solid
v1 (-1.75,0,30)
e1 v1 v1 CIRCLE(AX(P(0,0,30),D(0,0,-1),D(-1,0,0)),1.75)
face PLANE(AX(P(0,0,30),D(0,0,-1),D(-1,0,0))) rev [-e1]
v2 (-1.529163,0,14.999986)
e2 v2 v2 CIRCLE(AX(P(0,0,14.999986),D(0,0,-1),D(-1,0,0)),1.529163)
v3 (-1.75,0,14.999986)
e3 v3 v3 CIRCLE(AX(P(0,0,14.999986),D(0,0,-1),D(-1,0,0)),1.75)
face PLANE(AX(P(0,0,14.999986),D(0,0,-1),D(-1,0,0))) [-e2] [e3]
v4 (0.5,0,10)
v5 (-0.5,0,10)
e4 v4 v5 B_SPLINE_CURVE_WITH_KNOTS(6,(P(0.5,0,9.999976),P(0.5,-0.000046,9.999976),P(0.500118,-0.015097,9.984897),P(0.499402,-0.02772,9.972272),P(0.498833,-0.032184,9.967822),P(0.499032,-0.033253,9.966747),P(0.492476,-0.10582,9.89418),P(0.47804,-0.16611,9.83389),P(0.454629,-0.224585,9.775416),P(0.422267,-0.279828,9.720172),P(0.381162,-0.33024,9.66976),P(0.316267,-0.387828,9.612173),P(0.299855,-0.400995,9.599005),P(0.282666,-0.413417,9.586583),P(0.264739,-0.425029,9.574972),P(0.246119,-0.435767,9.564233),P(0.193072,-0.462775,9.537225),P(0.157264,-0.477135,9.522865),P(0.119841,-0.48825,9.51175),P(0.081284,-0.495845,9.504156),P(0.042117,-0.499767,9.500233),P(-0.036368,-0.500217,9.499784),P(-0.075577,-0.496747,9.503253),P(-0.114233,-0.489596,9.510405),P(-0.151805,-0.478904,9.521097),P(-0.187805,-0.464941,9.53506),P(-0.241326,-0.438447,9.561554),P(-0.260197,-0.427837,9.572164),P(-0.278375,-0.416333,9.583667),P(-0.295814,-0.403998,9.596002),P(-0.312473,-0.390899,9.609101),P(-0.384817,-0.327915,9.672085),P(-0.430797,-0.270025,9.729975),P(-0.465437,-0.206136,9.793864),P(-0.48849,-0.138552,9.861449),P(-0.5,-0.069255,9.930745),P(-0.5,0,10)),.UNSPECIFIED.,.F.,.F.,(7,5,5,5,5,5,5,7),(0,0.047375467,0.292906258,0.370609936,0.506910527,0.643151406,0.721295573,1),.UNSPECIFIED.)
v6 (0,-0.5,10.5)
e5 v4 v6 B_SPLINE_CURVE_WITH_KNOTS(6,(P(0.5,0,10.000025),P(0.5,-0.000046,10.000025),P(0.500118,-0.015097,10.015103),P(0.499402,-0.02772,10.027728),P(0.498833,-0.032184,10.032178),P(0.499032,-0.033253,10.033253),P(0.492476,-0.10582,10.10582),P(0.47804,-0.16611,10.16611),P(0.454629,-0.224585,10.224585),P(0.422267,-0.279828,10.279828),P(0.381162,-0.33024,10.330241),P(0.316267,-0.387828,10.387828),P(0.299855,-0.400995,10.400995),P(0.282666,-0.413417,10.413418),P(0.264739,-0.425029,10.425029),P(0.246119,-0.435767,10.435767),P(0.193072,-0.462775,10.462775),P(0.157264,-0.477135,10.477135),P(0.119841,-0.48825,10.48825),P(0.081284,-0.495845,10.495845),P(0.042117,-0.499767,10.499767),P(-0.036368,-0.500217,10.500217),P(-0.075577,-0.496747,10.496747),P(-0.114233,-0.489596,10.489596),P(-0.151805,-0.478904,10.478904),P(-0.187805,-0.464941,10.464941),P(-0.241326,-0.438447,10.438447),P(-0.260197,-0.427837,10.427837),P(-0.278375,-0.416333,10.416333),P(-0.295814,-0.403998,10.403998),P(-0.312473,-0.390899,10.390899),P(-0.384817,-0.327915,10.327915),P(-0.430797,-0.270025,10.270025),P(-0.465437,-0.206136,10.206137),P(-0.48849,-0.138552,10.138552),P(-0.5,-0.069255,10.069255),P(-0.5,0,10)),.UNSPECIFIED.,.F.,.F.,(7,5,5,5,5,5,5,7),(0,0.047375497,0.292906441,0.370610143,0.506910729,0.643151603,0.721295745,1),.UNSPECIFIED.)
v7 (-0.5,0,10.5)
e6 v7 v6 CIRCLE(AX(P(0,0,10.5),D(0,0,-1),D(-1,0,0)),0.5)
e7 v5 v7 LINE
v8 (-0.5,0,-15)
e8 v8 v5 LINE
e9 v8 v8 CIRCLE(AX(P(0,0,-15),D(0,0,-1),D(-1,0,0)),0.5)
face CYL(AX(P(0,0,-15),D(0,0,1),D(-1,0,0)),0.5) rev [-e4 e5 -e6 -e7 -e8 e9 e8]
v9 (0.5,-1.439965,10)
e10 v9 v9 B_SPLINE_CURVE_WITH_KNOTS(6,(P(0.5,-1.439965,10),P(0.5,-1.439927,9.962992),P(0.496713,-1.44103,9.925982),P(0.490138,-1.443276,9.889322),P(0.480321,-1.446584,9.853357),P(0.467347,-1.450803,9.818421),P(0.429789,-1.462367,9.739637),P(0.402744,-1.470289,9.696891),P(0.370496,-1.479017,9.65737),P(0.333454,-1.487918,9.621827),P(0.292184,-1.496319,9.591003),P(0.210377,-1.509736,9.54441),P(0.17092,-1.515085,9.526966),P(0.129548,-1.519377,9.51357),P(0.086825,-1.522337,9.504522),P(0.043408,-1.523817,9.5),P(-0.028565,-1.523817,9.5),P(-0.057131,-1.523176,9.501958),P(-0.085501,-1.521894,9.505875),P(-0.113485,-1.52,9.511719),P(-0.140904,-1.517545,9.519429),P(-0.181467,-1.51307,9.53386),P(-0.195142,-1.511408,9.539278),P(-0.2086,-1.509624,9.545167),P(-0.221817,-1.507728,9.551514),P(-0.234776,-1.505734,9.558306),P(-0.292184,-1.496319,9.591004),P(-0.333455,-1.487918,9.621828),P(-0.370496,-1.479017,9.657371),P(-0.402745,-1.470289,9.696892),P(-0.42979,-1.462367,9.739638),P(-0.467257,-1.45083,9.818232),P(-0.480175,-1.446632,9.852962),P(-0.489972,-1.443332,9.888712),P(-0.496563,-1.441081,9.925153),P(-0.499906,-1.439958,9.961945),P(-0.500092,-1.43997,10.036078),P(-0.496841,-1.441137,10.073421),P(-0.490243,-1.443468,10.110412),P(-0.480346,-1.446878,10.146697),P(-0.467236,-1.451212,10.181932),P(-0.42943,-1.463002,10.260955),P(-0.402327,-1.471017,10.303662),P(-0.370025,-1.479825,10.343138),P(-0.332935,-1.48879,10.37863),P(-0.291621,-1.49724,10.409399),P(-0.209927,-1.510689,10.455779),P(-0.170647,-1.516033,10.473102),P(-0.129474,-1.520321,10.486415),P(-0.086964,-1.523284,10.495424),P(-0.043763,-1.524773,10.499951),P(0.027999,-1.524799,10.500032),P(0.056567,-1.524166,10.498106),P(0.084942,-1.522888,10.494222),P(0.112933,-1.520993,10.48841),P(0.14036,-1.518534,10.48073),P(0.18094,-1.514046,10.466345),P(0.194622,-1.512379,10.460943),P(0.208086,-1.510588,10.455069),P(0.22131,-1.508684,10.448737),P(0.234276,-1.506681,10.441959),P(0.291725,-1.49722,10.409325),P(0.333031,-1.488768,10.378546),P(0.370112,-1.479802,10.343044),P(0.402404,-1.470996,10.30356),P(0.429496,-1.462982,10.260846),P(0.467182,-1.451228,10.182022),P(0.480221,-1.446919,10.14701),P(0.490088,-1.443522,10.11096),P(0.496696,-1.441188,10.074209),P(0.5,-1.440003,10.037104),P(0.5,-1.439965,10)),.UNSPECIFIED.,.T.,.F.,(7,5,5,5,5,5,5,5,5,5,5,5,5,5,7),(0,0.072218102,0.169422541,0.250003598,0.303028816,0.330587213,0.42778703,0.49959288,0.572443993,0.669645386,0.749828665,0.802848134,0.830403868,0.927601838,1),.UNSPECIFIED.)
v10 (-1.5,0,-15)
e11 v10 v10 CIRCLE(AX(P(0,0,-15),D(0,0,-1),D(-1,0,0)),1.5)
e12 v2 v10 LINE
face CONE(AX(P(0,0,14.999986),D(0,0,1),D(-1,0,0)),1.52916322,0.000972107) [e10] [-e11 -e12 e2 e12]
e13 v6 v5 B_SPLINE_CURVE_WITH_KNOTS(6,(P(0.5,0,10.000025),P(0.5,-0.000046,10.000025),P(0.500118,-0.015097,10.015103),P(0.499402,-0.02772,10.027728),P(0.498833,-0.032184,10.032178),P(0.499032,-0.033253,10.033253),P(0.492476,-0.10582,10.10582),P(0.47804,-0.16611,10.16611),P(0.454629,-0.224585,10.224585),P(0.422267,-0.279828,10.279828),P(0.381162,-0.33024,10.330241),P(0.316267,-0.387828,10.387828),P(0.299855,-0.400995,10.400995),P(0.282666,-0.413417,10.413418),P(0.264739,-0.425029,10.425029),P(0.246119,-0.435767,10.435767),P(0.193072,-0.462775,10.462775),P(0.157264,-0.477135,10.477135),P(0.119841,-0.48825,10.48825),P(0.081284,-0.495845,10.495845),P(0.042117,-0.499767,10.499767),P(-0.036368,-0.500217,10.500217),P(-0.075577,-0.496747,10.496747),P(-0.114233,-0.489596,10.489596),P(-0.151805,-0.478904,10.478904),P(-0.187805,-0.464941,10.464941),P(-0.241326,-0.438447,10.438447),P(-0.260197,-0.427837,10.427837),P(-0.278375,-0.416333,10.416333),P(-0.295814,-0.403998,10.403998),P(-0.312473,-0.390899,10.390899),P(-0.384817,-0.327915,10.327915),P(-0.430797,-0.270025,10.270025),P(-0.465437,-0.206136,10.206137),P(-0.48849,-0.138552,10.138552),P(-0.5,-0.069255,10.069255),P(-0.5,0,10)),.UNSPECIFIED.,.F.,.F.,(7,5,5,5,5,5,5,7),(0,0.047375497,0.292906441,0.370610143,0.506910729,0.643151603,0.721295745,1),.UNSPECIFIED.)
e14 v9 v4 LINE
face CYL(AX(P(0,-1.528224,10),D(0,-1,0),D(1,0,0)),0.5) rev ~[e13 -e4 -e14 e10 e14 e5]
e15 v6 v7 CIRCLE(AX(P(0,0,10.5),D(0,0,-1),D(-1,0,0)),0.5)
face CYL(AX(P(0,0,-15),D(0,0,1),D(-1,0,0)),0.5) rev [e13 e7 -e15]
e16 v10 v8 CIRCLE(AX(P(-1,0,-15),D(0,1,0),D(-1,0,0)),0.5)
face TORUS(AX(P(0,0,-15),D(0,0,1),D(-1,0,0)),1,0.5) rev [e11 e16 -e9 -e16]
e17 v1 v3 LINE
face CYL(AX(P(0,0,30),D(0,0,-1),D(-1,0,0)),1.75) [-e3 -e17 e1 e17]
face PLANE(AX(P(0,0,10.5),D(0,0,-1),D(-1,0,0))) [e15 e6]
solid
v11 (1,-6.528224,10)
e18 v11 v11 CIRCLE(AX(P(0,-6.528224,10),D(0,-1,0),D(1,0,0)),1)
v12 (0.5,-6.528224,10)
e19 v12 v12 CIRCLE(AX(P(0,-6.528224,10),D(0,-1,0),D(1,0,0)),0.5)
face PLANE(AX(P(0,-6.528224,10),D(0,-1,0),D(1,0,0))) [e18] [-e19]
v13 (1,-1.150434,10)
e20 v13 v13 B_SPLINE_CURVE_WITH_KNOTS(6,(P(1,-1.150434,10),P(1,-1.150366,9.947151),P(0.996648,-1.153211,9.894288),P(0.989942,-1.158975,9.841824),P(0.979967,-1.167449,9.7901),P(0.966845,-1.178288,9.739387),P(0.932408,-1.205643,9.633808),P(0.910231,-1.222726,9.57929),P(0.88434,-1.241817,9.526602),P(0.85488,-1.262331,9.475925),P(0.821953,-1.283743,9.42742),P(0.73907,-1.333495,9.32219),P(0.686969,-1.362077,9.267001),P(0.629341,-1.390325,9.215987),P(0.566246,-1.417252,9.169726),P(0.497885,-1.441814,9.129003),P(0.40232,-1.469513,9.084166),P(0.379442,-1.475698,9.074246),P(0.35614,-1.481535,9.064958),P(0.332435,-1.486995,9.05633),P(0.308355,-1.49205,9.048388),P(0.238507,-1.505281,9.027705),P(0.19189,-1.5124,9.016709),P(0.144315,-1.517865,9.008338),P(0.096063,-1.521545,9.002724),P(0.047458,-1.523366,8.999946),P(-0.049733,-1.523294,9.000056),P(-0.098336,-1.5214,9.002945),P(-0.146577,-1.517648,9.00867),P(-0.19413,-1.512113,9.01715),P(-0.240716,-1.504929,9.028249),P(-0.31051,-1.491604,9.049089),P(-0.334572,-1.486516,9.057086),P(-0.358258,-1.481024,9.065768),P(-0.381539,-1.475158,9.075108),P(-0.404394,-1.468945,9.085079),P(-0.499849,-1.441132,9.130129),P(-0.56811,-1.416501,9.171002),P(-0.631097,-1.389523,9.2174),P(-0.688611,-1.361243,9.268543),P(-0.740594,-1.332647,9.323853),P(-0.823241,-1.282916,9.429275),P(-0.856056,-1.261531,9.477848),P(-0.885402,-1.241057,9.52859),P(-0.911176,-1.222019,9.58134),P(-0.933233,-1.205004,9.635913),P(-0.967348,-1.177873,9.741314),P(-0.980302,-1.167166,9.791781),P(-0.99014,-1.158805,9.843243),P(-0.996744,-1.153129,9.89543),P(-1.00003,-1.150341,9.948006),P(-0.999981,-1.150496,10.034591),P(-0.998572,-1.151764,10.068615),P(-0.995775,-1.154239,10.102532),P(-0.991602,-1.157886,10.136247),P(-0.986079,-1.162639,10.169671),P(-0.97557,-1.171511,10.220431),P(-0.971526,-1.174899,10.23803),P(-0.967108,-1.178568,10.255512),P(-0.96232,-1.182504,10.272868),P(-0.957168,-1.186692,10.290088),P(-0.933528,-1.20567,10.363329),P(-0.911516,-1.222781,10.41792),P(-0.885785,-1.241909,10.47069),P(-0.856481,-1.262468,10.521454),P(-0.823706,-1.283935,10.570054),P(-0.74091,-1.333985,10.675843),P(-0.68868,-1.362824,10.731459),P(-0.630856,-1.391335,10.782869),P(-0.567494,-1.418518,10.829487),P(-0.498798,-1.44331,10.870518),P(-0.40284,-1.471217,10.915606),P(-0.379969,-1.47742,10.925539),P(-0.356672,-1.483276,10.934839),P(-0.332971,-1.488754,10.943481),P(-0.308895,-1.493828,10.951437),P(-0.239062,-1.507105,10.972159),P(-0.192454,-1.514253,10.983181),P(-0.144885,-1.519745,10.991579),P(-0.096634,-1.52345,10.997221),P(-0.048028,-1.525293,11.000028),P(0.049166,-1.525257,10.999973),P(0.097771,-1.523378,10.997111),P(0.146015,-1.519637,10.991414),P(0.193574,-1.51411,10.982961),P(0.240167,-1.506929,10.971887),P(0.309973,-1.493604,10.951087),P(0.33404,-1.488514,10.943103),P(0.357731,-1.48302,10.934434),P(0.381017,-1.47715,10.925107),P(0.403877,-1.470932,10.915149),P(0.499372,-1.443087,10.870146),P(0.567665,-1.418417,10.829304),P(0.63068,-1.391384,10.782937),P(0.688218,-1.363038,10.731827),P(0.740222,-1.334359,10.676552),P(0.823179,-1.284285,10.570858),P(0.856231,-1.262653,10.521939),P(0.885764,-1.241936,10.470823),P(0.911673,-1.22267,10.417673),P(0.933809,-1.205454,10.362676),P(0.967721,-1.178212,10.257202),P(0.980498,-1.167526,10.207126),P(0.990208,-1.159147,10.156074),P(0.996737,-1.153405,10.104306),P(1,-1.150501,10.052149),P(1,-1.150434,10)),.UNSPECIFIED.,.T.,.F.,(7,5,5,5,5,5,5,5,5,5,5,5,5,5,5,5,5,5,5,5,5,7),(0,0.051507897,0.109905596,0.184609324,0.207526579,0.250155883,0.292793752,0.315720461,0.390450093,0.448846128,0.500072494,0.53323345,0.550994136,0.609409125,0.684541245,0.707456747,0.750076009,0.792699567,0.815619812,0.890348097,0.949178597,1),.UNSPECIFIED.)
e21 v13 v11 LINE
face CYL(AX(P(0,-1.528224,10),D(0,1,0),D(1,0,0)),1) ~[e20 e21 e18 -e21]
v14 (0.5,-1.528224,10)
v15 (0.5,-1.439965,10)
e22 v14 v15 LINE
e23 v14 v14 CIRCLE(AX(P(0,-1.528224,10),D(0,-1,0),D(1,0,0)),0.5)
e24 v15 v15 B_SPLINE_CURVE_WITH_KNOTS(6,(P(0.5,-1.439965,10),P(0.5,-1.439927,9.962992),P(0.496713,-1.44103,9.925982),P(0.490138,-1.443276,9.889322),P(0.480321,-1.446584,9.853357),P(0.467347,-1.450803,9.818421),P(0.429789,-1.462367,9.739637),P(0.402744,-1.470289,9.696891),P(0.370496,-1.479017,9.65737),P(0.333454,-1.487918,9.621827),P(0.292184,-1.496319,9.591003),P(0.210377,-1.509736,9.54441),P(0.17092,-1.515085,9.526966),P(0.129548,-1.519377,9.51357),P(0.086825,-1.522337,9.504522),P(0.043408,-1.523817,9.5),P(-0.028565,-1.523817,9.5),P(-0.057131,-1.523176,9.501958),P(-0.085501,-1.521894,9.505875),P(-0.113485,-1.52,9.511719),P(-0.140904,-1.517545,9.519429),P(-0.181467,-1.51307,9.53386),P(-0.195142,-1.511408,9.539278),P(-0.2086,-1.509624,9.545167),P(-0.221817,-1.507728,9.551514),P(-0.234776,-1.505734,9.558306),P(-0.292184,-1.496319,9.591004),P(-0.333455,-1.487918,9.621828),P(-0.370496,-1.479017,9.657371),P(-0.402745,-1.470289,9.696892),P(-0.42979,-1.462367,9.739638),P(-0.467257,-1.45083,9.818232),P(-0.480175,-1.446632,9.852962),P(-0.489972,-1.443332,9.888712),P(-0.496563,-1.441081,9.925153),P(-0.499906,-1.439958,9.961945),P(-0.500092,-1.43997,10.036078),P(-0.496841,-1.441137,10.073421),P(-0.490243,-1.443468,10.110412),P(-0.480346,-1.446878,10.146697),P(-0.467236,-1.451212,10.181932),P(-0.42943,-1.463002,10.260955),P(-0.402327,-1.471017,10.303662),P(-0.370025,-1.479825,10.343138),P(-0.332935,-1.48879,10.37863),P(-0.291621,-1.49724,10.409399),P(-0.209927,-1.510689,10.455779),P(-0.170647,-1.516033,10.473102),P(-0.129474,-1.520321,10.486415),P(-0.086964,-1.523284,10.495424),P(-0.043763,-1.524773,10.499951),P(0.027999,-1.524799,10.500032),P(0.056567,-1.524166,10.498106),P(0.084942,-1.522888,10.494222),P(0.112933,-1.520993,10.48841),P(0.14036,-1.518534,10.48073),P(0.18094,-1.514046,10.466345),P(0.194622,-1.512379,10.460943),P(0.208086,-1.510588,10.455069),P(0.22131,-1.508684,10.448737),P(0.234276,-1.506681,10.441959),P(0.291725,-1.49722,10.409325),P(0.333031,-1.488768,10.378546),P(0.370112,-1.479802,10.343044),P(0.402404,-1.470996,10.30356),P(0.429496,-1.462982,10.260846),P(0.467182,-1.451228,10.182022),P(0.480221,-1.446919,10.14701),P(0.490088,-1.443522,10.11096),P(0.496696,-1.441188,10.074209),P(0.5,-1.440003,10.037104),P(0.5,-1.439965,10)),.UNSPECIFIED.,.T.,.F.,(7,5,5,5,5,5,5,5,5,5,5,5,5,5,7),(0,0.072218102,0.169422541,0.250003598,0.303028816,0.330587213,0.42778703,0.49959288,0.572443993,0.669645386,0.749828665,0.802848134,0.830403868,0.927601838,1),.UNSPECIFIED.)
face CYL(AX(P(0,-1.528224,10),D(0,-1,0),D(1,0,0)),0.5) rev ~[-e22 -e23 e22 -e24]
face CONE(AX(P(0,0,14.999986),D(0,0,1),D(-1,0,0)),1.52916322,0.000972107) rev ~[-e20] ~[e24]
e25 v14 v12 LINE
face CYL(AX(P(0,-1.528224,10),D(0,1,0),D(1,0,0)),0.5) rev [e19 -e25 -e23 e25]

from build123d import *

# Parameters (mm, degrees)
F4_R     = 0.5
F5_REACH = 4.6934378881
F4_R_2   = 1
F7_DEPTH = 5


with BuildPart() as f1:
    # F0 (on Front) → F1 (revolve)
    with BuildSketch(Plane.XZ):
        with BuildLine():
            Line((-1.5291632199, 14.9999860381), (-1.5, -14.999999787))
            ThreePointArc((-1.5, -14.999999787), (-1, -14.499999787), (-0.5, -14.999999787))
            Line((-0.5, -14.999999787), (-0.5000000003, 10.500000213))
            Line((-0.5000000003, 10.500000213), (-3e-10, 10.500000213))
            Line((-3e-10, 10.500000213), (-3e-10, 30.000000213))
            Line((-3e-10, 30.000000213), (-1.7500000003, 30.000000213))
            Line((-1.7500000003, 30.000000213), (-1.7500000003, 14.9999860381))
            Line((-1.7500000003, 14.9999860381), (-1.5291632199, 14.9999860381))
        make_face()
    revolve(axis=Axis((-3e-10, 0, 7.500000213), (0, 0, -1)))

    f5_end = f1.faces().sort_by_distance((0.4999999994, 0, -2.249999787))[0]
    # F4 (on plane+point) → F5 (cut, up to a face of the model that its end follows)
    with BuildSketch(Plane.XZ.offset(1.5282243257)):
        with Locations((0, 10.000000213)):
            Circle(F4_R)
    f5_long = extrude(amount=-F5_REACH, mode=Mode.PRIVATE)
    add(split(f5_long, bisect_by=f5_end, keep=Keep.ALL, mode=Mode.PRIVATE).solids().sort_by_distance((0, -1.5282243257, 10.000000213))[0], mode=Mode.SUBTRACT)


with BuildPart() as f6:
    # F4 (on plane+point) → F6 (new body, up to the next surface of F1)
    with BuildSketch(Plane.XZ.offset(1.5282243257)):
        with Locations((0, 10.000000213)):
            Circle(F4_R_2)
        with Locations((0, 10.000000213)):
            Circle(F4_R, mode=Mode.SUBTRACT)
    extrude(until=Until.NEXT, target=f1.part, dir=(0, 1, 0))

    # F4 (on plane+point) → F7 (join)
    with BuildSketch(Plane.XZ.offset(1.5282243257)):
        with Locations((0, 10.000000213)):
            Circle(F4_R_2)
        with Locations((0, 10.000000213)):
            Circle(F4_R, mode=Mode.SUBTRACT)
    extrude(amount=F7_DEPTH)


solid = Compound([f1.part, f6.part])
